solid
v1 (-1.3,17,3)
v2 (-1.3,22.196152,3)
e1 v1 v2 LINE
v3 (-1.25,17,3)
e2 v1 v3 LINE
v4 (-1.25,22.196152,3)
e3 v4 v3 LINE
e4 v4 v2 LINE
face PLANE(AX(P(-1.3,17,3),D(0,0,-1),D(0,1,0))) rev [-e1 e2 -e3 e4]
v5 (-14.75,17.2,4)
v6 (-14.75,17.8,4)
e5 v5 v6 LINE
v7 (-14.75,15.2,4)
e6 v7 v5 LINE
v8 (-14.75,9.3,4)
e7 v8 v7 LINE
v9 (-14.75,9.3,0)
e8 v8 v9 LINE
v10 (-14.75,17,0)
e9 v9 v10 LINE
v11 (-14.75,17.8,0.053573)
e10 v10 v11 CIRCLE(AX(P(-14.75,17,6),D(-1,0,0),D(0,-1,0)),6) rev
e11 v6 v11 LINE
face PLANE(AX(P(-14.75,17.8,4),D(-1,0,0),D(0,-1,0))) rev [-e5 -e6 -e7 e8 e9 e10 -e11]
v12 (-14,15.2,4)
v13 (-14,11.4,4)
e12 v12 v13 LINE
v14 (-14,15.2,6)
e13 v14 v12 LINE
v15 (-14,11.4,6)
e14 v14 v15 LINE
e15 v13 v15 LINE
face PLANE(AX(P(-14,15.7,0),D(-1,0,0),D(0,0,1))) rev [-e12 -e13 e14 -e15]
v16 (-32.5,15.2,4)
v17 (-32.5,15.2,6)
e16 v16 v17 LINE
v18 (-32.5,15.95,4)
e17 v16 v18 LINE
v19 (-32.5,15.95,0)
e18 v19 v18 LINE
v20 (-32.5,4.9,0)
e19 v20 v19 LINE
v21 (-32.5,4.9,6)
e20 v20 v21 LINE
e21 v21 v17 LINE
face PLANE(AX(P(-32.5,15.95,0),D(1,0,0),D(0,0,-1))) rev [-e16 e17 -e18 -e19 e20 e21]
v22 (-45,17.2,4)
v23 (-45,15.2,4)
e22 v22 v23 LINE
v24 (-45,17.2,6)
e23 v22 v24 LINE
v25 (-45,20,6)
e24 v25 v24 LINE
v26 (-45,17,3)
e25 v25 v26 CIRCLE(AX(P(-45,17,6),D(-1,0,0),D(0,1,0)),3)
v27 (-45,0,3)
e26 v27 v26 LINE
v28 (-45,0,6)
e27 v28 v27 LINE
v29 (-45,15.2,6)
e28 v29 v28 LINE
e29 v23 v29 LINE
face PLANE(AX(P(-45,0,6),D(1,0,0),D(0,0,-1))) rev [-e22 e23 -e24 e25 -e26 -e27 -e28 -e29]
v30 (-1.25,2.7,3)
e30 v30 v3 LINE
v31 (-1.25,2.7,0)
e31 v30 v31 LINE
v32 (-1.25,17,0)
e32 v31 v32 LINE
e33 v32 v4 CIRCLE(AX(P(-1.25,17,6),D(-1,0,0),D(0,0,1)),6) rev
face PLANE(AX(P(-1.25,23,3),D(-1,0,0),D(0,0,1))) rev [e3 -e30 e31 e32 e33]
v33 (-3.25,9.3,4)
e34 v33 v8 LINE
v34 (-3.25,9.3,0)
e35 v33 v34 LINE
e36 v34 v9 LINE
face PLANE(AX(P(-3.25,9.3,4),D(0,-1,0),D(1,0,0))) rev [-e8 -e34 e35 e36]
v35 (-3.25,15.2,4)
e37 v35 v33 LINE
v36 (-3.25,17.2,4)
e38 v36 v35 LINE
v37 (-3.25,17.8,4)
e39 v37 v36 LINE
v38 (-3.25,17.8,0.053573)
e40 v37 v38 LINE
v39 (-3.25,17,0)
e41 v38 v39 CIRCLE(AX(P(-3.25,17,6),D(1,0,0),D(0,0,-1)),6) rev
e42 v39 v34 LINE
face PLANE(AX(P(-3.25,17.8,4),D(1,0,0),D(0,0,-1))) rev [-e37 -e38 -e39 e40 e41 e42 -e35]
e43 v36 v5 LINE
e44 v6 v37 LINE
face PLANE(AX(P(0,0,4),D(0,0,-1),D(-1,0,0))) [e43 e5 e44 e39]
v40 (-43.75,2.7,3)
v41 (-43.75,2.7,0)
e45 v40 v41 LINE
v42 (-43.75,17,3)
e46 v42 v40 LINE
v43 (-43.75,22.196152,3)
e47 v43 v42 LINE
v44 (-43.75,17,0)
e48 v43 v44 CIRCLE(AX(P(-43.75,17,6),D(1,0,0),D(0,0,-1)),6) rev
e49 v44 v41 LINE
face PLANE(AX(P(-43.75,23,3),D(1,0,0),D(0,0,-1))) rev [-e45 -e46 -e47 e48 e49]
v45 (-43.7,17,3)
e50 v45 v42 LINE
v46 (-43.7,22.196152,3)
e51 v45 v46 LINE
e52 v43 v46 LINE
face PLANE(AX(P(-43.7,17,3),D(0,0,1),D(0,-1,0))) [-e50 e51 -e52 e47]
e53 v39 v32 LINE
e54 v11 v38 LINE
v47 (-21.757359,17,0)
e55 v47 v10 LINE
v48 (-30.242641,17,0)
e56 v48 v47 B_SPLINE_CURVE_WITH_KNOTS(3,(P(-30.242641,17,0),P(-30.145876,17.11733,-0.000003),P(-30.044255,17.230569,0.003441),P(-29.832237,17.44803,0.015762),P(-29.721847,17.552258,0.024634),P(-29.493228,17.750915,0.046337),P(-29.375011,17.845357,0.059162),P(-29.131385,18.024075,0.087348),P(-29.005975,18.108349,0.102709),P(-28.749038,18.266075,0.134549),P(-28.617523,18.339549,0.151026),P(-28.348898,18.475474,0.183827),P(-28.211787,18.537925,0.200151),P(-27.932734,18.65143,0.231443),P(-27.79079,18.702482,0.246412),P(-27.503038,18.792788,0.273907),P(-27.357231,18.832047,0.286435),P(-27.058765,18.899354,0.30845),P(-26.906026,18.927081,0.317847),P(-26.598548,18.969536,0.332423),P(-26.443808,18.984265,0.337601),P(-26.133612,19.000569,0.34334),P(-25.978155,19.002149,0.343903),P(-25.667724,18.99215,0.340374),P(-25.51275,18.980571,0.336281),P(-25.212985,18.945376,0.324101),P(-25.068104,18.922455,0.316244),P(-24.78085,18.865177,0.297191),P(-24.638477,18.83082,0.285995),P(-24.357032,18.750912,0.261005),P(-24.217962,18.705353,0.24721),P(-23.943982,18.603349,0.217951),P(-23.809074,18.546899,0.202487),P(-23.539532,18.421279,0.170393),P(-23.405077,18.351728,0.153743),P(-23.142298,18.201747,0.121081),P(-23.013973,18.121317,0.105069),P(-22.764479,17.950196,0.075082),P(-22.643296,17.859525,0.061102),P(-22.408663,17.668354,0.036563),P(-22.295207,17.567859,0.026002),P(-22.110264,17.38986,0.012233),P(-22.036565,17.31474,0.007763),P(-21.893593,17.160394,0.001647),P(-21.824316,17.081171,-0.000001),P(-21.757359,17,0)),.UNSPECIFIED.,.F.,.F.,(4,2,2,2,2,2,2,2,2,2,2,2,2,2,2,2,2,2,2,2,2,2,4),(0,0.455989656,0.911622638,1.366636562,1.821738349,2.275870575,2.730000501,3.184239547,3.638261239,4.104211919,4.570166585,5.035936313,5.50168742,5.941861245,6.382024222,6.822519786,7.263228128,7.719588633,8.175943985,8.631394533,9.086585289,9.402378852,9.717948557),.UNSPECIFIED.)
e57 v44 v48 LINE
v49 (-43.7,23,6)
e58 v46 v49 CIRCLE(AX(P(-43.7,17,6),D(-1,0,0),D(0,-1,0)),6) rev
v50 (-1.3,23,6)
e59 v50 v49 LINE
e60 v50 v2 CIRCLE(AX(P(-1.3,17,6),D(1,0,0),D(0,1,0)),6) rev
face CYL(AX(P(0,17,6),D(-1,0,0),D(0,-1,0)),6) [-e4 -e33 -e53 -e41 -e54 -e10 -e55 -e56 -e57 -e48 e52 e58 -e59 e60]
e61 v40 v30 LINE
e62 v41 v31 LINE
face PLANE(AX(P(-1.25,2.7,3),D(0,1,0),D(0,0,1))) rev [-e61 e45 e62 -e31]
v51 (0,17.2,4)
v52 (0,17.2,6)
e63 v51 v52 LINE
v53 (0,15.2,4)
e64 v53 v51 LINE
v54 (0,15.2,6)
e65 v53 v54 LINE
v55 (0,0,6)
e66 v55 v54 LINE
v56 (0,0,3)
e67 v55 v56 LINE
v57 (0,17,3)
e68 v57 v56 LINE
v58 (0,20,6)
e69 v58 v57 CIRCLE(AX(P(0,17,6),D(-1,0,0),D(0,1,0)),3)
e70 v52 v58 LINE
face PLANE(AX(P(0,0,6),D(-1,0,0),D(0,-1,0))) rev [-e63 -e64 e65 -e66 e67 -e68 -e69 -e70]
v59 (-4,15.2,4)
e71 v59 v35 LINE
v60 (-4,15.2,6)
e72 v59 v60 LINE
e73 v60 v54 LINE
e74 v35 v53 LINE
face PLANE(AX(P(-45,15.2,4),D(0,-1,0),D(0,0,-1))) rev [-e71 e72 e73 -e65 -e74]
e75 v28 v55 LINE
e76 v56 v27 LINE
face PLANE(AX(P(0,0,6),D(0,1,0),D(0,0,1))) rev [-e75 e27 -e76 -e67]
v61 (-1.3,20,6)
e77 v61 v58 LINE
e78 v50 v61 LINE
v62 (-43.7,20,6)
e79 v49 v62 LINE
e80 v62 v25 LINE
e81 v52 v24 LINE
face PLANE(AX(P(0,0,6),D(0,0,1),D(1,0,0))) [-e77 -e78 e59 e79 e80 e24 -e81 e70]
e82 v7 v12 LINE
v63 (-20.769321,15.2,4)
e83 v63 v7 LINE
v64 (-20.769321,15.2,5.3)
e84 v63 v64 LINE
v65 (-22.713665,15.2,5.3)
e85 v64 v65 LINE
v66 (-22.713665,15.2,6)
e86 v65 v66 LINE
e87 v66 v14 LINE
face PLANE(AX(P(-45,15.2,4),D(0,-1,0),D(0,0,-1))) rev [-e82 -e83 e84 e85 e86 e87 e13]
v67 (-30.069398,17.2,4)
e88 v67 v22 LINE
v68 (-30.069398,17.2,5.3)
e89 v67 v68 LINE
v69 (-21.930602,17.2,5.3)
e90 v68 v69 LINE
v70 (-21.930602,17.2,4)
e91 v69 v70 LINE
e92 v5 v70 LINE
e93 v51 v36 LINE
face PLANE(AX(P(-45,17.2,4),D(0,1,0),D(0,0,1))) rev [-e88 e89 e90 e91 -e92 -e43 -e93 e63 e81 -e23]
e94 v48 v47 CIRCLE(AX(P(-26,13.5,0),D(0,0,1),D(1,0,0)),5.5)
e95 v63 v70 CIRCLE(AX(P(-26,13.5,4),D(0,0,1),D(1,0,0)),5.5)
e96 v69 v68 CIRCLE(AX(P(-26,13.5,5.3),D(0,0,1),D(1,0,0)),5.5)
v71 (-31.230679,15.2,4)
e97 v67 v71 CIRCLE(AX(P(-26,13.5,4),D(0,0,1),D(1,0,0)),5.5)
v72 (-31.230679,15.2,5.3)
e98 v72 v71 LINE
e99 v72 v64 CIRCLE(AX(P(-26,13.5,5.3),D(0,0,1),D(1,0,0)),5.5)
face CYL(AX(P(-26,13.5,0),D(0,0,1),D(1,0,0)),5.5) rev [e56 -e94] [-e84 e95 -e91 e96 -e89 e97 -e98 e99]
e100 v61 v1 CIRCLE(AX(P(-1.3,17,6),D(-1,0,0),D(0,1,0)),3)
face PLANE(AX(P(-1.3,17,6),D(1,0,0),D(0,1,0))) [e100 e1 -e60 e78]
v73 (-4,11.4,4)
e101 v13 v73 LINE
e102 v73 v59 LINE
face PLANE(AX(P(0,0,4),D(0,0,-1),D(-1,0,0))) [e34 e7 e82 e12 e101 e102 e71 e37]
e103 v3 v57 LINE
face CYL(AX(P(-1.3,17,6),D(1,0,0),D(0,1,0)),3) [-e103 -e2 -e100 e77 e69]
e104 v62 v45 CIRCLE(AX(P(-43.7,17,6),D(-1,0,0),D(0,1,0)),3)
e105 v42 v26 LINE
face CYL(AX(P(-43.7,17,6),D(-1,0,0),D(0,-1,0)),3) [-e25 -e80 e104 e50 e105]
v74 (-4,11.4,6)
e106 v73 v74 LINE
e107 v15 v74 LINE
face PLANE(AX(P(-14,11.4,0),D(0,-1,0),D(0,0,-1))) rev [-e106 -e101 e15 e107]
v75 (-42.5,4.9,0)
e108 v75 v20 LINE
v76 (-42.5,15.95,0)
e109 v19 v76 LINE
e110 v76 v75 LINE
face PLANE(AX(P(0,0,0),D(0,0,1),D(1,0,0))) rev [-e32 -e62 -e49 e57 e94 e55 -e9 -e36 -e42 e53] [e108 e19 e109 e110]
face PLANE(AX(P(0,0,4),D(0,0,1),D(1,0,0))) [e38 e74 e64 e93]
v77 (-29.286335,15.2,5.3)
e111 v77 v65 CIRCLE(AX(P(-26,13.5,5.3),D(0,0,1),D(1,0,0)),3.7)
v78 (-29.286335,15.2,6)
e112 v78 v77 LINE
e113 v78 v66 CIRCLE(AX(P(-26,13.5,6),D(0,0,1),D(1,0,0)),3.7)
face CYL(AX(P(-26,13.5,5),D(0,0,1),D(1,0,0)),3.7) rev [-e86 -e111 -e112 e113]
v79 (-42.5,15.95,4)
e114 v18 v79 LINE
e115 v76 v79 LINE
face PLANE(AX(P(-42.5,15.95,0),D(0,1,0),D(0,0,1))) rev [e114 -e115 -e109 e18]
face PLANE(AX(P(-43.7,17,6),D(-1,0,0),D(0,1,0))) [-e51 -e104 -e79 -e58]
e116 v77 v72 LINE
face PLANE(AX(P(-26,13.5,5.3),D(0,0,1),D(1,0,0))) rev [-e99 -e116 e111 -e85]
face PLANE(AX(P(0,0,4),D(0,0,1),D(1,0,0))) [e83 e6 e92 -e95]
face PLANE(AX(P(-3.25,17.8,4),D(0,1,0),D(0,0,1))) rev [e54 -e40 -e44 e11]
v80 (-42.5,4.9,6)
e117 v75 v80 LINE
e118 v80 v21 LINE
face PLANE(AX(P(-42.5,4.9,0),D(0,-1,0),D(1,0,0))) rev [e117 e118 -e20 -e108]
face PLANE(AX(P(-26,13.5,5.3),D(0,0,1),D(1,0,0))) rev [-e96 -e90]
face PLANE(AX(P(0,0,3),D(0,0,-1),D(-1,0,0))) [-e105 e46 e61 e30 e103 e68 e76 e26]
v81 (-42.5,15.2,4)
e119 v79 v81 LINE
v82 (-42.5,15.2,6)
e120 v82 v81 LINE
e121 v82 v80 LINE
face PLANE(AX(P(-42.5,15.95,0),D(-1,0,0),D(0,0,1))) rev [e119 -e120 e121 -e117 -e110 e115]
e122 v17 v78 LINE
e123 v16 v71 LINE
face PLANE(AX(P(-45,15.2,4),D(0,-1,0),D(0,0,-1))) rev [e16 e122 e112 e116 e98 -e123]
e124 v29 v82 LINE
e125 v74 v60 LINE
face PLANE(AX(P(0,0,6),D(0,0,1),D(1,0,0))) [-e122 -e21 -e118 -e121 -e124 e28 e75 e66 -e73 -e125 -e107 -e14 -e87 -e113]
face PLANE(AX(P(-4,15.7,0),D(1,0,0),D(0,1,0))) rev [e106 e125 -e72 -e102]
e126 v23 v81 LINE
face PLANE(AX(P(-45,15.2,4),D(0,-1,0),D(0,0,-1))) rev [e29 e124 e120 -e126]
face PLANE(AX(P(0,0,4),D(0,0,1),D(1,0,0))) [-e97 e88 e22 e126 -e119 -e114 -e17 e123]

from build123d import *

# Parameters (mm, degrees)
ESQUISSE1_W             = 45
ESQUISSE1_H             = 23
BOSS_EXTRU_1_DEPTH      = 6
ENL_V_MAT_EXTRU_1_DEPTH = 3
CONG_1_R                = 6
ENL_V_MAT_EXTRU_3_DEPTH = 1.3
ESQUISSE7_W             = 45
ESQUISSE7_H             = 2
ENL_V_MAT_EXTRU_4_DEPTH = 2
ESQUISSE8_R             = 5.5
ESQUISSE8_W             = 10
ESQUISSE8_H             = 11.05
ESQUISSE8_H_2           = 4.3
ENL_V_MAT_EXTRU_5_DEPTH = 51.8920426
ESQUISSE9_W             = 11.5
ESQUISSE9_H             = 8.5
ENL_V_MAT_EXTRU_6_DEPTH = 4
BOSS_EXTRU_2_DEPTH      = 0.7
ESQUISSE12_R            = 3.7
ENL_V_MAT_EXTRU_8_DEPTH = 1


with BuildPart() as part:
    # Esquisse1 → Boss.-Extru.1 (new body)
    with BuildSketch(Plane.XY):
        with Locations((-22.5, 11.5)):
            Rectangle(ESQUISSE1_W, ESQUISSE1_H)
    extrude(amount=BOSS_EXTRU_1_DEPTH)

    # Esquisse2 → Enlèv. mat.-Extru.1 (cut)
    with BuildSketch(Plane(origin=(0, 0, 0), x_dir=(-1, 0, 0), z_dir=(0, 0, -1))):
        Polygon((0, 23), (1.25, 23), (1.25, 2.7), (43.75, 2.7), (43.75, 23), (45, 23), (45, 0), (0, 0), align=None)
    extrude(amount=-ENL_V_MAT_EXTRU_1_DEPTH, mode=Mode.SUBTRACT)

    # Congé1
    cong_1_edges = [part.edges().sort_by_distance(p)[0] for p in [
        (-22.5, 23, 0),
    ]]
    fillet(cong_1_edges, radius=CONG_1_R - 0.0001)  # a hair under: the kernel refuses the full size

    # Esquisse6 → Enlèv. mat.-Extru.3 (cut)
    with BuildSketch(Plane(origin=(0, 0, 0), x_dir=(0, 0, -1), z_dir=(1, 0, 0))):
        with BuildLine():
            Line((-3, 17), (-3, 23.616482957))
            Line((-3, 23.616482957), (-6, 23.616482957))
            Line((-6, 23.616482957), (-6, 20))
            ThreePointArc((-6, 20), (-3.878679656, 19.121320344), (-3, 17))
        make_face()
    enl_v_mat_extru_3 = extrude(amount=-ENL_V_MAT_EXTRU_3_DEPTH, mode=Mode.SUBTRACT)

    # Symétrie2: Enlèv. mat.-Extru.3 across plane
    add(enl_v_mat_extru_3.mirror(Plane.ZY.offset(22.5)), mode=Mode.SUBTRACT)

    # Esquisse7 → Enlèv. mat.-Extru.4 (cut)
    with BuildSketch(Plane.XY.offset(6)):
        with Locations((-22.5, 16.2)):
            Rectangle(ESQUISSE7_W, ESQUISSE7_H)
    extrude(amount=-ENL_V_MAT_EXTRU_4_DEPTH, mode=Mode.SUBTRACT)

    # Esquisse8 → Enlèv. mat.-Extru.5 (cut, through all)
    with BuildSketch(Plane.XY.offset(6)):
        with Locations(Location((-26, 13.5, 0), (0, 0, 18.004453))):
            Circle(ESQUISSE8_R)
        with Locations((-37.5, 10.425)):
            Rectangle(ESQUISSE8_W, ESQUISSE8_H)
        with Locations((-9, 13.55)):
            Rectangle(ESQUISSE8_W, ESQUISSE8_H_2)
    extrude(amount=-ENL_V_MAT_EXTRU_5_DEPTH, mode=Mode.SUBTRACT)

    # Esquisse9 → Enlèv. mat.-Extru.6 (cut)
    with BuildSketch(Plane(origin=(0, 0, 0), x_dir=(-1, 0, 0), z_dir=(0, 0, -1))):
        with Locations((9, 13.55)):
            Rectangle(ESQUISSE9_W, ESQUISSE9_H)
    extrude(amount=-ENL_V_MAT_EXTRU_6_DEPTH, mode=Mode.SUBTRACT)

    # Esquisse10 → Boss.-Extru.2 (add)
    with BuildSketch(Plane.XY.offset(6)):
        with BuildLine():
            Line((-30.06939799, 17.2), (-21.93060201, 17.2))
            ThreePointArc((-21.93060201, 17.2), (-26, 19), (-30.06939799, 17.2))
        make_face()
        with BuildLine():
            Line((-31.230678732, 15.2), (-20.769321268, 15.2))
            ThreePointArc((-20.769321268, 15.2), (-26, 8), (-31.230678732, 15.2))
        make_face()
    extrude(amount=-BOSS_EXTRU_2_DEPTH)

    # Esquisse12 → Enlèv. mat.-Extru.8 (cut)
    with BuildSketch(Plane.XY.offset(6)):
        with Locations((-26, 13.5)):
            Circle(ESQUISSE12_R)
    extrude(amount=-ENL_V_MAT_EXTRU_8_DEPTH, mode=Mode.SUBTRACT)


solid = part.part
